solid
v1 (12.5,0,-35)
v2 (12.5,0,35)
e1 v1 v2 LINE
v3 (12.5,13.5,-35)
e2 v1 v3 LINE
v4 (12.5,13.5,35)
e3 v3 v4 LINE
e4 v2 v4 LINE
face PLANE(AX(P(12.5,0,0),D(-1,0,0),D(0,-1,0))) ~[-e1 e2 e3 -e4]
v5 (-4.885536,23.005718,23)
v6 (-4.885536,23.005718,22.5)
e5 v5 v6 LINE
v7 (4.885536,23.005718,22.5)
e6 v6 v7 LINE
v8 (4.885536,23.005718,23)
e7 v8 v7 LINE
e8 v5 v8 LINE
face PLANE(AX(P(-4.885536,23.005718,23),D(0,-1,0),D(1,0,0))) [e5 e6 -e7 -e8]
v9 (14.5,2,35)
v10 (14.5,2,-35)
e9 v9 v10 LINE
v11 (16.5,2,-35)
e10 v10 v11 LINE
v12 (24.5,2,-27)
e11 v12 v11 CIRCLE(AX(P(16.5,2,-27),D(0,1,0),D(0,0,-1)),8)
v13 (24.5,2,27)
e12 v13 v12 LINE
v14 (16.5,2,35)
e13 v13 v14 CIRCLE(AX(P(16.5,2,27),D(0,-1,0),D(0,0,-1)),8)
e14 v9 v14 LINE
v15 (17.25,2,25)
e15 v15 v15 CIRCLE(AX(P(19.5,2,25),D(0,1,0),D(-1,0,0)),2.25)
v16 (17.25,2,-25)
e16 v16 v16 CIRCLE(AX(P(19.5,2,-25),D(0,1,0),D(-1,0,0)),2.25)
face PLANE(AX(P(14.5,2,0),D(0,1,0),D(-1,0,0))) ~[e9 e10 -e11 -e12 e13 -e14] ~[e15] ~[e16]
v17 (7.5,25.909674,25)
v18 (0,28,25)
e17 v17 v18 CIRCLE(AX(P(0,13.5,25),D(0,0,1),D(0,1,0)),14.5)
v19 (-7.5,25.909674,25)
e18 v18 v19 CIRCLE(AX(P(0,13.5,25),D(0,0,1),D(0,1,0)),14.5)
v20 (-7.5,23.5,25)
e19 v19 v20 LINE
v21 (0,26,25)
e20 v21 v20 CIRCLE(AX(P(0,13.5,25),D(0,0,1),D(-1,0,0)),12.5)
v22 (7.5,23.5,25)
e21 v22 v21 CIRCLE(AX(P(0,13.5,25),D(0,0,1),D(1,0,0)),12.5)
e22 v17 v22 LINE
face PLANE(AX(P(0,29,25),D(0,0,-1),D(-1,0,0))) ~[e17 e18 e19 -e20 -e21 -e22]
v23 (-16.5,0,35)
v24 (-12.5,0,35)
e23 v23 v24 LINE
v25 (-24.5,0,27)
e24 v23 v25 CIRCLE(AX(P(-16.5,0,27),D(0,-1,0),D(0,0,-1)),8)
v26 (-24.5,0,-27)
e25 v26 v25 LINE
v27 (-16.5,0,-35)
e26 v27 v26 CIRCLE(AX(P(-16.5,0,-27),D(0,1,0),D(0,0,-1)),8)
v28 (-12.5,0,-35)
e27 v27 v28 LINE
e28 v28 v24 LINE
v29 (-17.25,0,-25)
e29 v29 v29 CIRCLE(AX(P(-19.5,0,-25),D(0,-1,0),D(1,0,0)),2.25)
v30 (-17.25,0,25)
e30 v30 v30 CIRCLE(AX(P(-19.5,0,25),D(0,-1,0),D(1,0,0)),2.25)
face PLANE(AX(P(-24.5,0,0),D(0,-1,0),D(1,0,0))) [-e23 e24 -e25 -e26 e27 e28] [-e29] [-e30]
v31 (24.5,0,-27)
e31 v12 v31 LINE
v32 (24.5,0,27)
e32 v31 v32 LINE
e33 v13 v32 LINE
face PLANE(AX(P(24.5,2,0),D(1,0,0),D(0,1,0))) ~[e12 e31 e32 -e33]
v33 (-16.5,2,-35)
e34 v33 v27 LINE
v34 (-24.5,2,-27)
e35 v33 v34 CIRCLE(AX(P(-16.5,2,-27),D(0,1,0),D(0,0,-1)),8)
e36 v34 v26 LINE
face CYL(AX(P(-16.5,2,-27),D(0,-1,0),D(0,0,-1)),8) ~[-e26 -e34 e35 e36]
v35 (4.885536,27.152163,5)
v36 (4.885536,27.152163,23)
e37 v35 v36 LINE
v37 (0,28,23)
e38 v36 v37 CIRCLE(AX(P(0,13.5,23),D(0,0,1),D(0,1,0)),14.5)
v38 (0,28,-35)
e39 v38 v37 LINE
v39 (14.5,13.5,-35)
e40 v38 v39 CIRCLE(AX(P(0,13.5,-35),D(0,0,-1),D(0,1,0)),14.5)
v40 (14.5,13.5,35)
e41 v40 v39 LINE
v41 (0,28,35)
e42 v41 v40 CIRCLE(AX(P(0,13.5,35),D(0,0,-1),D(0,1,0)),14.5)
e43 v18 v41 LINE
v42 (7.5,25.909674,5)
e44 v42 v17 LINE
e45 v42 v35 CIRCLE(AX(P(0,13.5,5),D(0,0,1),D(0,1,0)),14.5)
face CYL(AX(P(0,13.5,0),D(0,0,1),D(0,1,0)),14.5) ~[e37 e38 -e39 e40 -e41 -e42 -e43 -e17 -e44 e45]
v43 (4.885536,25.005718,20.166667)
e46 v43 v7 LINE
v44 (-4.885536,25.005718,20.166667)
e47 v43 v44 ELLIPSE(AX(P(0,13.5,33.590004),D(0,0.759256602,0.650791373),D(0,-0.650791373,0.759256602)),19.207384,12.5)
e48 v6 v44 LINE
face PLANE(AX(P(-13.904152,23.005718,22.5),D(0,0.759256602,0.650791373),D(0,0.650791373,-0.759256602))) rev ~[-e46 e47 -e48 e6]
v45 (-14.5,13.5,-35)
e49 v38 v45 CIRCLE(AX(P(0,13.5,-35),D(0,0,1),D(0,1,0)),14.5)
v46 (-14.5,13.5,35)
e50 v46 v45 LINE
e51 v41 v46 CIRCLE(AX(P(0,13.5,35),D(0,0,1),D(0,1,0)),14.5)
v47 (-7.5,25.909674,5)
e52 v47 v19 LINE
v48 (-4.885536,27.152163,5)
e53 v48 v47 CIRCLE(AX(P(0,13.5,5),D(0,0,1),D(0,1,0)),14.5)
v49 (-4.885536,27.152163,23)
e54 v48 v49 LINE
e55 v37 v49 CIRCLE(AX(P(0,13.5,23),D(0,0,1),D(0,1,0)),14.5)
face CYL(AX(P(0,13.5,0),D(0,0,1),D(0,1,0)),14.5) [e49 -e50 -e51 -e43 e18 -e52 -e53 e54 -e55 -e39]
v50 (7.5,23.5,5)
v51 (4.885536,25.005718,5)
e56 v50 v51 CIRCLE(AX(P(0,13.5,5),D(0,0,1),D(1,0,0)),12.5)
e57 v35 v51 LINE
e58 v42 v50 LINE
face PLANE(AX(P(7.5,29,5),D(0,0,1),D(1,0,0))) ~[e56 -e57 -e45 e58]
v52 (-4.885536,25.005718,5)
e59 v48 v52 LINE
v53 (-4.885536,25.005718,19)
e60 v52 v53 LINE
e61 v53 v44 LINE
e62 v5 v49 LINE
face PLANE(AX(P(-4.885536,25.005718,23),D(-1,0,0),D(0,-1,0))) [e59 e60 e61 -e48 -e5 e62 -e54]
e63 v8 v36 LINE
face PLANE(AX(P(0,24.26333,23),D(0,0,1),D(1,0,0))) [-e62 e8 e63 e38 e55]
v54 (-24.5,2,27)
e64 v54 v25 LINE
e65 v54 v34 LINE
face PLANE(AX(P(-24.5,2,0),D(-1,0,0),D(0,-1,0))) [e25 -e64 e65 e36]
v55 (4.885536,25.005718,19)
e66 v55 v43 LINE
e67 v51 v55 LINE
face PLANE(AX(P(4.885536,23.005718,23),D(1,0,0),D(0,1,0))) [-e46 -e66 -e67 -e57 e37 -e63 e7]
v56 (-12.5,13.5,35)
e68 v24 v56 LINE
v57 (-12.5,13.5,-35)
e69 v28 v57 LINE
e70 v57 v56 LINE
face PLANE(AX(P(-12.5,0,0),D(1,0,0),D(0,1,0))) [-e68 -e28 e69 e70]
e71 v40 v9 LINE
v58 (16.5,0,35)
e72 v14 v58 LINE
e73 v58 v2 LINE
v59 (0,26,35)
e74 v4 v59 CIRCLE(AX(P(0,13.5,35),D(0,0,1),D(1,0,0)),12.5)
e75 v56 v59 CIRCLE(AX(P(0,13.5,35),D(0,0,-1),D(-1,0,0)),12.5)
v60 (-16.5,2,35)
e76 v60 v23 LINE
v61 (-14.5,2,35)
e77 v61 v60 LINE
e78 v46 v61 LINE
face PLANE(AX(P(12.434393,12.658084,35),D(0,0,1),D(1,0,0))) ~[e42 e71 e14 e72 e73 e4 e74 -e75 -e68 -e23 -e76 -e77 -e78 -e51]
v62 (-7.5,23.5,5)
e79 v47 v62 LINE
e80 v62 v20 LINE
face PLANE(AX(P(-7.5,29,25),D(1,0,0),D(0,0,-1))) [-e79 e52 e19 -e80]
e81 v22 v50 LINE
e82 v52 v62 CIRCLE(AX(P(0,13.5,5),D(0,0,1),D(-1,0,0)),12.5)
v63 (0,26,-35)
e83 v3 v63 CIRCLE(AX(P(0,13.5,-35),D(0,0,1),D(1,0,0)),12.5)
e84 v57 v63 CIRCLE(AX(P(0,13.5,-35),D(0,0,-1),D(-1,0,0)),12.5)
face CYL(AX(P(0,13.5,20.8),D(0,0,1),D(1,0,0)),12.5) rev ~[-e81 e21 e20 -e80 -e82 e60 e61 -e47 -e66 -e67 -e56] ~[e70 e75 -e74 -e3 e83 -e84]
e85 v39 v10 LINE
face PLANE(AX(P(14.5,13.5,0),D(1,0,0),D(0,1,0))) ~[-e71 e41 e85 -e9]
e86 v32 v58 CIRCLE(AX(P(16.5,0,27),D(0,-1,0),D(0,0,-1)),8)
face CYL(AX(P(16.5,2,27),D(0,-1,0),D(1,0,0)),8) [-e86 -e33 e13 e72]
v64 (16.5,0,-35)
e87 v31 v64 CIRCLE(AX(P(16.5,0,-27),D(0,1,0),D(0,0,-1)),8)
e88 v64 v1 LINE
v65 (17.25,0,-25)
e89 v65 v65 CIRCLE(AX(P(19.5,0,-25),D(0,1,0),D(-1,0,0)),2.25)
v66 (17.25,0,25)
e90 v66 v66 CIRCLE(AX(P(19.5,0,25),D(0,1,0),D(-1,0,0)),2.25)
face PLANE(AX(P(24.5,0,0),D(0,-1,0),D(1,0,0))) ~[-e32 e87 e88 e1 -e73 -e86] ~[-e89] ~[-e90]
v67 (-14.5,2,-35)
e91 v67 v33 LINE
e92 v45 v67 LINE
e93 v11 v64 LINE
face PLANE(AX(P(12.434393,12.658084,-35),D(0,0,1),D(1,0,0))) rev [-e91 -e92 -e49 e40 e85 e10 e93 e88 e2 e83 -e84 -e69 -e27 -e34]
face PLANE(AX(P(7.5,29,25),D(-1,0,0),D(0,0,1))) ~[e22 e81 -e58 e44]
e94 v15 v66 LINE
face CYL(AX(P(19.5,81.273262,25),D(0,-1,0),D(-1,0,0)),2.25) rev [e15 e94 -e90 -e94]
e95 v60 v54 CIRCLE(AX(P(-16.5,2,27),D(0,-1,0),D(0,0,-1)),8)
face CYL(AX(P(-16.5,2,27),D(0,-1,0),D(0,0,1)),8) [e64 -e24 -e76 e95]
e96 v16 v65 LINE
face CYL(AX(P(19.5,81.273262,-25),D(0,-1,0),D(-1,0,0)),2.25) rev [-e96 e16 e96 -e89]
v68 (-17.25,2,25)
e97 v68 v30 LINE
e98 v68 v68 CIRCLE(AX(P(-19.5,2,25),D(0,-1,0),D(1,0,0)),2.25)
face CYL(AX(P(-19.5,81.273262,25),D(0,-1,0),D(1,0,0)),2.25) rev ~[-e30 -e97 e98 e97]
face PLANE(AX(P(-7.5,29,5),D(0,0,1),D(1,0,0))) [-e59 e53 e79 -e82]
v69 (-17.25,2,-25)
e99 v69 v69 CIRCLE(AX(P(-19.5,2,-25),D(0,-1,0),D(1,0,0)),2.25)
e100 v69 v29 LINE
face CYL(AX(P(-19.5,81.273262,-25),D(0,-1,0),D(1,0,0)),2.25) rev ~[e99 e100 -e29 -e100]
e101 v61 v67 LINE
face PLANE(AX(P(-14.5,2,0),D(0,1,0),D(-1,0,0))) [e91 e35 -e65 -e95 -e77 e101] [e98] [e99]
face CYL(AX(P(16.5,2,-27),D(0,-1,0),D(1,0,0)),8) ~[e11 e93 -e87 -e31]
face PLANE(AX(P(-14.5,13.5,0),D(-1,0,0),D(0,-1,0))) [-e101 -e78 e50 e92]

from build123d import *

# Parameters (mm, degrees)
F1_DEPTH     = 35
F3_D         = 4.5
F7_REACH     = 50.3610093633
F8_R         = 8
F10_DEPTH    = 4
F11_T4_DEPTH = 27.8083046081
F11_S5_R     = 12.5
F11_T6_DEPTH = 16


# Not quite as in the source:
# - a fillet or chamfer that OpenCascade refuses, or shapes differently, is made with other operations: its cross-section is extruded or revolved along the edge and cut away or added
# - a pattern or mirror of a feature is missing from the dataset's text; its kind, count and spacing are read off the source's solid


with BuildPart() as f1:
    # F0 (on Top) → F1 (new body, symmetric)
    with BuildSketch(Plane.XY):
        with BuildLine():
            Line((-24.5, 2), (-24.5, 0))
            Line((-24.5, 0), (-12.5, 0))
            Line((-12.5, 0), (-12.5, 13.5))
            ThreePointArc((-12.5, 13.5), (-8.8388347648, 22.3388347648), (0, 26))
            Line((0, 26), (0, 28))
            ThreePointArc((0, 28), (-10.2530483272, 23.7530483272), (-14.5, 13.5))
            Line((-14.5, 13.5), (-14.5, 2))
            Line((-14.5, 2), (-24.5, 2))
        make_face()
    extrude(amount=F1_DEPTH, both=True)

    # F3 (through all)
    with Locations(Plane(origin=(0, 2, 0), x_dir=(-1, 0, 0), z_dir=(0, 1, 0))):
        with Locations((19.5, -25), (19.5, 25)):
            Hole(F3_D / 2)

    # F4: F1 across plane


with BuildPart() as f1_1:
    add(f1.part)
    add(f1.part.mirror(Plane.YZ))

    f7_end = f1_1.faces().sort_by_distance((0, 26, 0))[0]
    # F6 (on offset) → F7 (cut, up to a face of the model that its end follows)
    with BuildSketch(Plane.XZ.offset(-29)):
        Polygon((0, 23), (0, 25), (-7.5, 25), (-7.5, 5), (-4.8855356313, 5), (-4.8855356313, 23), align=None)
    f7_long = extrude(amount=F7_REACH, mode=Mode.PRIVATE)
    f7 = split(f7_long, bisect_by=f7_end, keep=Keep.BOTTOM, mode=Mode.PRIVATE)
    add(f7, mode=Mode.SUBTRACT)

    # F7_copies: F7 across plane
    add(f7.mirror(Plane(origin=(0, 0, 0), x_dir=(0, 0, 1), z_dir=(1, 0, 0))), mode=Mode.SUBTRACT)

    # F8
    f8_edges = [f1_1.edges().sort_by_distance(p)[0] for p in [
        (-24.5, 1, -35),
        (24.5, 1, -35),
        (-24.5, 1, 35),
        (24.5, 1, 35),
    ]]
    fillet(f8_edges, radius=F8_R)

    # F9 (on face) → F10 (join)
    with BuildSketch(Plane.XY.offset(23)):
        with BuildLine():
            ThreePointArc((4.8855356313, 25.0057177783), (0, 26), (-4.8855356313, 25.0057177783))
            Line((-4.8855356313, 25.0057177783), (-4.8855356313, 23.0057177783))
            Line((-4.8855356313, 23.0057177783), (4.8855356313, 23.0057177783))
            Line((4.8855356313, 23.0057177783), (4.8855356313, 25.0057177783))
        make_face()
    extrude(amount=-F10_DEPTH)

    # F11: chamfer of 3 x 3.5 on 1 edges, made by hand


with BuildPart() as f11_tool2:
    # F11_s3 → F11_t4 (new body)
    with BuildSketch(Plane.YZ.offset(-13.9041523041)):
        Polygon((23.0057177783, 22.5), (26.0057177783, 19), (23.0057177783, 19), align=None)
    extrude(amount=F11_T4_DEPTH)

    # F11_s5 → F11_t6 (intersect, symmetric)
    with BuildSketch(Plane.XY.offset(20.8)):
        with Locations((0, 13.5)):
            Circle(F11_S5_R)
    extrude(amount=F11_T6_DEPTH, both=True, mode=Mode.INTERSECT)


with BuildPart() as f1_2:
    add(f1_1.part)

    # F11_t1: cut F11_tool2
    add(f11_tool2.part, mode=Mode.SUBTRACT)


solid = f1_2.part
